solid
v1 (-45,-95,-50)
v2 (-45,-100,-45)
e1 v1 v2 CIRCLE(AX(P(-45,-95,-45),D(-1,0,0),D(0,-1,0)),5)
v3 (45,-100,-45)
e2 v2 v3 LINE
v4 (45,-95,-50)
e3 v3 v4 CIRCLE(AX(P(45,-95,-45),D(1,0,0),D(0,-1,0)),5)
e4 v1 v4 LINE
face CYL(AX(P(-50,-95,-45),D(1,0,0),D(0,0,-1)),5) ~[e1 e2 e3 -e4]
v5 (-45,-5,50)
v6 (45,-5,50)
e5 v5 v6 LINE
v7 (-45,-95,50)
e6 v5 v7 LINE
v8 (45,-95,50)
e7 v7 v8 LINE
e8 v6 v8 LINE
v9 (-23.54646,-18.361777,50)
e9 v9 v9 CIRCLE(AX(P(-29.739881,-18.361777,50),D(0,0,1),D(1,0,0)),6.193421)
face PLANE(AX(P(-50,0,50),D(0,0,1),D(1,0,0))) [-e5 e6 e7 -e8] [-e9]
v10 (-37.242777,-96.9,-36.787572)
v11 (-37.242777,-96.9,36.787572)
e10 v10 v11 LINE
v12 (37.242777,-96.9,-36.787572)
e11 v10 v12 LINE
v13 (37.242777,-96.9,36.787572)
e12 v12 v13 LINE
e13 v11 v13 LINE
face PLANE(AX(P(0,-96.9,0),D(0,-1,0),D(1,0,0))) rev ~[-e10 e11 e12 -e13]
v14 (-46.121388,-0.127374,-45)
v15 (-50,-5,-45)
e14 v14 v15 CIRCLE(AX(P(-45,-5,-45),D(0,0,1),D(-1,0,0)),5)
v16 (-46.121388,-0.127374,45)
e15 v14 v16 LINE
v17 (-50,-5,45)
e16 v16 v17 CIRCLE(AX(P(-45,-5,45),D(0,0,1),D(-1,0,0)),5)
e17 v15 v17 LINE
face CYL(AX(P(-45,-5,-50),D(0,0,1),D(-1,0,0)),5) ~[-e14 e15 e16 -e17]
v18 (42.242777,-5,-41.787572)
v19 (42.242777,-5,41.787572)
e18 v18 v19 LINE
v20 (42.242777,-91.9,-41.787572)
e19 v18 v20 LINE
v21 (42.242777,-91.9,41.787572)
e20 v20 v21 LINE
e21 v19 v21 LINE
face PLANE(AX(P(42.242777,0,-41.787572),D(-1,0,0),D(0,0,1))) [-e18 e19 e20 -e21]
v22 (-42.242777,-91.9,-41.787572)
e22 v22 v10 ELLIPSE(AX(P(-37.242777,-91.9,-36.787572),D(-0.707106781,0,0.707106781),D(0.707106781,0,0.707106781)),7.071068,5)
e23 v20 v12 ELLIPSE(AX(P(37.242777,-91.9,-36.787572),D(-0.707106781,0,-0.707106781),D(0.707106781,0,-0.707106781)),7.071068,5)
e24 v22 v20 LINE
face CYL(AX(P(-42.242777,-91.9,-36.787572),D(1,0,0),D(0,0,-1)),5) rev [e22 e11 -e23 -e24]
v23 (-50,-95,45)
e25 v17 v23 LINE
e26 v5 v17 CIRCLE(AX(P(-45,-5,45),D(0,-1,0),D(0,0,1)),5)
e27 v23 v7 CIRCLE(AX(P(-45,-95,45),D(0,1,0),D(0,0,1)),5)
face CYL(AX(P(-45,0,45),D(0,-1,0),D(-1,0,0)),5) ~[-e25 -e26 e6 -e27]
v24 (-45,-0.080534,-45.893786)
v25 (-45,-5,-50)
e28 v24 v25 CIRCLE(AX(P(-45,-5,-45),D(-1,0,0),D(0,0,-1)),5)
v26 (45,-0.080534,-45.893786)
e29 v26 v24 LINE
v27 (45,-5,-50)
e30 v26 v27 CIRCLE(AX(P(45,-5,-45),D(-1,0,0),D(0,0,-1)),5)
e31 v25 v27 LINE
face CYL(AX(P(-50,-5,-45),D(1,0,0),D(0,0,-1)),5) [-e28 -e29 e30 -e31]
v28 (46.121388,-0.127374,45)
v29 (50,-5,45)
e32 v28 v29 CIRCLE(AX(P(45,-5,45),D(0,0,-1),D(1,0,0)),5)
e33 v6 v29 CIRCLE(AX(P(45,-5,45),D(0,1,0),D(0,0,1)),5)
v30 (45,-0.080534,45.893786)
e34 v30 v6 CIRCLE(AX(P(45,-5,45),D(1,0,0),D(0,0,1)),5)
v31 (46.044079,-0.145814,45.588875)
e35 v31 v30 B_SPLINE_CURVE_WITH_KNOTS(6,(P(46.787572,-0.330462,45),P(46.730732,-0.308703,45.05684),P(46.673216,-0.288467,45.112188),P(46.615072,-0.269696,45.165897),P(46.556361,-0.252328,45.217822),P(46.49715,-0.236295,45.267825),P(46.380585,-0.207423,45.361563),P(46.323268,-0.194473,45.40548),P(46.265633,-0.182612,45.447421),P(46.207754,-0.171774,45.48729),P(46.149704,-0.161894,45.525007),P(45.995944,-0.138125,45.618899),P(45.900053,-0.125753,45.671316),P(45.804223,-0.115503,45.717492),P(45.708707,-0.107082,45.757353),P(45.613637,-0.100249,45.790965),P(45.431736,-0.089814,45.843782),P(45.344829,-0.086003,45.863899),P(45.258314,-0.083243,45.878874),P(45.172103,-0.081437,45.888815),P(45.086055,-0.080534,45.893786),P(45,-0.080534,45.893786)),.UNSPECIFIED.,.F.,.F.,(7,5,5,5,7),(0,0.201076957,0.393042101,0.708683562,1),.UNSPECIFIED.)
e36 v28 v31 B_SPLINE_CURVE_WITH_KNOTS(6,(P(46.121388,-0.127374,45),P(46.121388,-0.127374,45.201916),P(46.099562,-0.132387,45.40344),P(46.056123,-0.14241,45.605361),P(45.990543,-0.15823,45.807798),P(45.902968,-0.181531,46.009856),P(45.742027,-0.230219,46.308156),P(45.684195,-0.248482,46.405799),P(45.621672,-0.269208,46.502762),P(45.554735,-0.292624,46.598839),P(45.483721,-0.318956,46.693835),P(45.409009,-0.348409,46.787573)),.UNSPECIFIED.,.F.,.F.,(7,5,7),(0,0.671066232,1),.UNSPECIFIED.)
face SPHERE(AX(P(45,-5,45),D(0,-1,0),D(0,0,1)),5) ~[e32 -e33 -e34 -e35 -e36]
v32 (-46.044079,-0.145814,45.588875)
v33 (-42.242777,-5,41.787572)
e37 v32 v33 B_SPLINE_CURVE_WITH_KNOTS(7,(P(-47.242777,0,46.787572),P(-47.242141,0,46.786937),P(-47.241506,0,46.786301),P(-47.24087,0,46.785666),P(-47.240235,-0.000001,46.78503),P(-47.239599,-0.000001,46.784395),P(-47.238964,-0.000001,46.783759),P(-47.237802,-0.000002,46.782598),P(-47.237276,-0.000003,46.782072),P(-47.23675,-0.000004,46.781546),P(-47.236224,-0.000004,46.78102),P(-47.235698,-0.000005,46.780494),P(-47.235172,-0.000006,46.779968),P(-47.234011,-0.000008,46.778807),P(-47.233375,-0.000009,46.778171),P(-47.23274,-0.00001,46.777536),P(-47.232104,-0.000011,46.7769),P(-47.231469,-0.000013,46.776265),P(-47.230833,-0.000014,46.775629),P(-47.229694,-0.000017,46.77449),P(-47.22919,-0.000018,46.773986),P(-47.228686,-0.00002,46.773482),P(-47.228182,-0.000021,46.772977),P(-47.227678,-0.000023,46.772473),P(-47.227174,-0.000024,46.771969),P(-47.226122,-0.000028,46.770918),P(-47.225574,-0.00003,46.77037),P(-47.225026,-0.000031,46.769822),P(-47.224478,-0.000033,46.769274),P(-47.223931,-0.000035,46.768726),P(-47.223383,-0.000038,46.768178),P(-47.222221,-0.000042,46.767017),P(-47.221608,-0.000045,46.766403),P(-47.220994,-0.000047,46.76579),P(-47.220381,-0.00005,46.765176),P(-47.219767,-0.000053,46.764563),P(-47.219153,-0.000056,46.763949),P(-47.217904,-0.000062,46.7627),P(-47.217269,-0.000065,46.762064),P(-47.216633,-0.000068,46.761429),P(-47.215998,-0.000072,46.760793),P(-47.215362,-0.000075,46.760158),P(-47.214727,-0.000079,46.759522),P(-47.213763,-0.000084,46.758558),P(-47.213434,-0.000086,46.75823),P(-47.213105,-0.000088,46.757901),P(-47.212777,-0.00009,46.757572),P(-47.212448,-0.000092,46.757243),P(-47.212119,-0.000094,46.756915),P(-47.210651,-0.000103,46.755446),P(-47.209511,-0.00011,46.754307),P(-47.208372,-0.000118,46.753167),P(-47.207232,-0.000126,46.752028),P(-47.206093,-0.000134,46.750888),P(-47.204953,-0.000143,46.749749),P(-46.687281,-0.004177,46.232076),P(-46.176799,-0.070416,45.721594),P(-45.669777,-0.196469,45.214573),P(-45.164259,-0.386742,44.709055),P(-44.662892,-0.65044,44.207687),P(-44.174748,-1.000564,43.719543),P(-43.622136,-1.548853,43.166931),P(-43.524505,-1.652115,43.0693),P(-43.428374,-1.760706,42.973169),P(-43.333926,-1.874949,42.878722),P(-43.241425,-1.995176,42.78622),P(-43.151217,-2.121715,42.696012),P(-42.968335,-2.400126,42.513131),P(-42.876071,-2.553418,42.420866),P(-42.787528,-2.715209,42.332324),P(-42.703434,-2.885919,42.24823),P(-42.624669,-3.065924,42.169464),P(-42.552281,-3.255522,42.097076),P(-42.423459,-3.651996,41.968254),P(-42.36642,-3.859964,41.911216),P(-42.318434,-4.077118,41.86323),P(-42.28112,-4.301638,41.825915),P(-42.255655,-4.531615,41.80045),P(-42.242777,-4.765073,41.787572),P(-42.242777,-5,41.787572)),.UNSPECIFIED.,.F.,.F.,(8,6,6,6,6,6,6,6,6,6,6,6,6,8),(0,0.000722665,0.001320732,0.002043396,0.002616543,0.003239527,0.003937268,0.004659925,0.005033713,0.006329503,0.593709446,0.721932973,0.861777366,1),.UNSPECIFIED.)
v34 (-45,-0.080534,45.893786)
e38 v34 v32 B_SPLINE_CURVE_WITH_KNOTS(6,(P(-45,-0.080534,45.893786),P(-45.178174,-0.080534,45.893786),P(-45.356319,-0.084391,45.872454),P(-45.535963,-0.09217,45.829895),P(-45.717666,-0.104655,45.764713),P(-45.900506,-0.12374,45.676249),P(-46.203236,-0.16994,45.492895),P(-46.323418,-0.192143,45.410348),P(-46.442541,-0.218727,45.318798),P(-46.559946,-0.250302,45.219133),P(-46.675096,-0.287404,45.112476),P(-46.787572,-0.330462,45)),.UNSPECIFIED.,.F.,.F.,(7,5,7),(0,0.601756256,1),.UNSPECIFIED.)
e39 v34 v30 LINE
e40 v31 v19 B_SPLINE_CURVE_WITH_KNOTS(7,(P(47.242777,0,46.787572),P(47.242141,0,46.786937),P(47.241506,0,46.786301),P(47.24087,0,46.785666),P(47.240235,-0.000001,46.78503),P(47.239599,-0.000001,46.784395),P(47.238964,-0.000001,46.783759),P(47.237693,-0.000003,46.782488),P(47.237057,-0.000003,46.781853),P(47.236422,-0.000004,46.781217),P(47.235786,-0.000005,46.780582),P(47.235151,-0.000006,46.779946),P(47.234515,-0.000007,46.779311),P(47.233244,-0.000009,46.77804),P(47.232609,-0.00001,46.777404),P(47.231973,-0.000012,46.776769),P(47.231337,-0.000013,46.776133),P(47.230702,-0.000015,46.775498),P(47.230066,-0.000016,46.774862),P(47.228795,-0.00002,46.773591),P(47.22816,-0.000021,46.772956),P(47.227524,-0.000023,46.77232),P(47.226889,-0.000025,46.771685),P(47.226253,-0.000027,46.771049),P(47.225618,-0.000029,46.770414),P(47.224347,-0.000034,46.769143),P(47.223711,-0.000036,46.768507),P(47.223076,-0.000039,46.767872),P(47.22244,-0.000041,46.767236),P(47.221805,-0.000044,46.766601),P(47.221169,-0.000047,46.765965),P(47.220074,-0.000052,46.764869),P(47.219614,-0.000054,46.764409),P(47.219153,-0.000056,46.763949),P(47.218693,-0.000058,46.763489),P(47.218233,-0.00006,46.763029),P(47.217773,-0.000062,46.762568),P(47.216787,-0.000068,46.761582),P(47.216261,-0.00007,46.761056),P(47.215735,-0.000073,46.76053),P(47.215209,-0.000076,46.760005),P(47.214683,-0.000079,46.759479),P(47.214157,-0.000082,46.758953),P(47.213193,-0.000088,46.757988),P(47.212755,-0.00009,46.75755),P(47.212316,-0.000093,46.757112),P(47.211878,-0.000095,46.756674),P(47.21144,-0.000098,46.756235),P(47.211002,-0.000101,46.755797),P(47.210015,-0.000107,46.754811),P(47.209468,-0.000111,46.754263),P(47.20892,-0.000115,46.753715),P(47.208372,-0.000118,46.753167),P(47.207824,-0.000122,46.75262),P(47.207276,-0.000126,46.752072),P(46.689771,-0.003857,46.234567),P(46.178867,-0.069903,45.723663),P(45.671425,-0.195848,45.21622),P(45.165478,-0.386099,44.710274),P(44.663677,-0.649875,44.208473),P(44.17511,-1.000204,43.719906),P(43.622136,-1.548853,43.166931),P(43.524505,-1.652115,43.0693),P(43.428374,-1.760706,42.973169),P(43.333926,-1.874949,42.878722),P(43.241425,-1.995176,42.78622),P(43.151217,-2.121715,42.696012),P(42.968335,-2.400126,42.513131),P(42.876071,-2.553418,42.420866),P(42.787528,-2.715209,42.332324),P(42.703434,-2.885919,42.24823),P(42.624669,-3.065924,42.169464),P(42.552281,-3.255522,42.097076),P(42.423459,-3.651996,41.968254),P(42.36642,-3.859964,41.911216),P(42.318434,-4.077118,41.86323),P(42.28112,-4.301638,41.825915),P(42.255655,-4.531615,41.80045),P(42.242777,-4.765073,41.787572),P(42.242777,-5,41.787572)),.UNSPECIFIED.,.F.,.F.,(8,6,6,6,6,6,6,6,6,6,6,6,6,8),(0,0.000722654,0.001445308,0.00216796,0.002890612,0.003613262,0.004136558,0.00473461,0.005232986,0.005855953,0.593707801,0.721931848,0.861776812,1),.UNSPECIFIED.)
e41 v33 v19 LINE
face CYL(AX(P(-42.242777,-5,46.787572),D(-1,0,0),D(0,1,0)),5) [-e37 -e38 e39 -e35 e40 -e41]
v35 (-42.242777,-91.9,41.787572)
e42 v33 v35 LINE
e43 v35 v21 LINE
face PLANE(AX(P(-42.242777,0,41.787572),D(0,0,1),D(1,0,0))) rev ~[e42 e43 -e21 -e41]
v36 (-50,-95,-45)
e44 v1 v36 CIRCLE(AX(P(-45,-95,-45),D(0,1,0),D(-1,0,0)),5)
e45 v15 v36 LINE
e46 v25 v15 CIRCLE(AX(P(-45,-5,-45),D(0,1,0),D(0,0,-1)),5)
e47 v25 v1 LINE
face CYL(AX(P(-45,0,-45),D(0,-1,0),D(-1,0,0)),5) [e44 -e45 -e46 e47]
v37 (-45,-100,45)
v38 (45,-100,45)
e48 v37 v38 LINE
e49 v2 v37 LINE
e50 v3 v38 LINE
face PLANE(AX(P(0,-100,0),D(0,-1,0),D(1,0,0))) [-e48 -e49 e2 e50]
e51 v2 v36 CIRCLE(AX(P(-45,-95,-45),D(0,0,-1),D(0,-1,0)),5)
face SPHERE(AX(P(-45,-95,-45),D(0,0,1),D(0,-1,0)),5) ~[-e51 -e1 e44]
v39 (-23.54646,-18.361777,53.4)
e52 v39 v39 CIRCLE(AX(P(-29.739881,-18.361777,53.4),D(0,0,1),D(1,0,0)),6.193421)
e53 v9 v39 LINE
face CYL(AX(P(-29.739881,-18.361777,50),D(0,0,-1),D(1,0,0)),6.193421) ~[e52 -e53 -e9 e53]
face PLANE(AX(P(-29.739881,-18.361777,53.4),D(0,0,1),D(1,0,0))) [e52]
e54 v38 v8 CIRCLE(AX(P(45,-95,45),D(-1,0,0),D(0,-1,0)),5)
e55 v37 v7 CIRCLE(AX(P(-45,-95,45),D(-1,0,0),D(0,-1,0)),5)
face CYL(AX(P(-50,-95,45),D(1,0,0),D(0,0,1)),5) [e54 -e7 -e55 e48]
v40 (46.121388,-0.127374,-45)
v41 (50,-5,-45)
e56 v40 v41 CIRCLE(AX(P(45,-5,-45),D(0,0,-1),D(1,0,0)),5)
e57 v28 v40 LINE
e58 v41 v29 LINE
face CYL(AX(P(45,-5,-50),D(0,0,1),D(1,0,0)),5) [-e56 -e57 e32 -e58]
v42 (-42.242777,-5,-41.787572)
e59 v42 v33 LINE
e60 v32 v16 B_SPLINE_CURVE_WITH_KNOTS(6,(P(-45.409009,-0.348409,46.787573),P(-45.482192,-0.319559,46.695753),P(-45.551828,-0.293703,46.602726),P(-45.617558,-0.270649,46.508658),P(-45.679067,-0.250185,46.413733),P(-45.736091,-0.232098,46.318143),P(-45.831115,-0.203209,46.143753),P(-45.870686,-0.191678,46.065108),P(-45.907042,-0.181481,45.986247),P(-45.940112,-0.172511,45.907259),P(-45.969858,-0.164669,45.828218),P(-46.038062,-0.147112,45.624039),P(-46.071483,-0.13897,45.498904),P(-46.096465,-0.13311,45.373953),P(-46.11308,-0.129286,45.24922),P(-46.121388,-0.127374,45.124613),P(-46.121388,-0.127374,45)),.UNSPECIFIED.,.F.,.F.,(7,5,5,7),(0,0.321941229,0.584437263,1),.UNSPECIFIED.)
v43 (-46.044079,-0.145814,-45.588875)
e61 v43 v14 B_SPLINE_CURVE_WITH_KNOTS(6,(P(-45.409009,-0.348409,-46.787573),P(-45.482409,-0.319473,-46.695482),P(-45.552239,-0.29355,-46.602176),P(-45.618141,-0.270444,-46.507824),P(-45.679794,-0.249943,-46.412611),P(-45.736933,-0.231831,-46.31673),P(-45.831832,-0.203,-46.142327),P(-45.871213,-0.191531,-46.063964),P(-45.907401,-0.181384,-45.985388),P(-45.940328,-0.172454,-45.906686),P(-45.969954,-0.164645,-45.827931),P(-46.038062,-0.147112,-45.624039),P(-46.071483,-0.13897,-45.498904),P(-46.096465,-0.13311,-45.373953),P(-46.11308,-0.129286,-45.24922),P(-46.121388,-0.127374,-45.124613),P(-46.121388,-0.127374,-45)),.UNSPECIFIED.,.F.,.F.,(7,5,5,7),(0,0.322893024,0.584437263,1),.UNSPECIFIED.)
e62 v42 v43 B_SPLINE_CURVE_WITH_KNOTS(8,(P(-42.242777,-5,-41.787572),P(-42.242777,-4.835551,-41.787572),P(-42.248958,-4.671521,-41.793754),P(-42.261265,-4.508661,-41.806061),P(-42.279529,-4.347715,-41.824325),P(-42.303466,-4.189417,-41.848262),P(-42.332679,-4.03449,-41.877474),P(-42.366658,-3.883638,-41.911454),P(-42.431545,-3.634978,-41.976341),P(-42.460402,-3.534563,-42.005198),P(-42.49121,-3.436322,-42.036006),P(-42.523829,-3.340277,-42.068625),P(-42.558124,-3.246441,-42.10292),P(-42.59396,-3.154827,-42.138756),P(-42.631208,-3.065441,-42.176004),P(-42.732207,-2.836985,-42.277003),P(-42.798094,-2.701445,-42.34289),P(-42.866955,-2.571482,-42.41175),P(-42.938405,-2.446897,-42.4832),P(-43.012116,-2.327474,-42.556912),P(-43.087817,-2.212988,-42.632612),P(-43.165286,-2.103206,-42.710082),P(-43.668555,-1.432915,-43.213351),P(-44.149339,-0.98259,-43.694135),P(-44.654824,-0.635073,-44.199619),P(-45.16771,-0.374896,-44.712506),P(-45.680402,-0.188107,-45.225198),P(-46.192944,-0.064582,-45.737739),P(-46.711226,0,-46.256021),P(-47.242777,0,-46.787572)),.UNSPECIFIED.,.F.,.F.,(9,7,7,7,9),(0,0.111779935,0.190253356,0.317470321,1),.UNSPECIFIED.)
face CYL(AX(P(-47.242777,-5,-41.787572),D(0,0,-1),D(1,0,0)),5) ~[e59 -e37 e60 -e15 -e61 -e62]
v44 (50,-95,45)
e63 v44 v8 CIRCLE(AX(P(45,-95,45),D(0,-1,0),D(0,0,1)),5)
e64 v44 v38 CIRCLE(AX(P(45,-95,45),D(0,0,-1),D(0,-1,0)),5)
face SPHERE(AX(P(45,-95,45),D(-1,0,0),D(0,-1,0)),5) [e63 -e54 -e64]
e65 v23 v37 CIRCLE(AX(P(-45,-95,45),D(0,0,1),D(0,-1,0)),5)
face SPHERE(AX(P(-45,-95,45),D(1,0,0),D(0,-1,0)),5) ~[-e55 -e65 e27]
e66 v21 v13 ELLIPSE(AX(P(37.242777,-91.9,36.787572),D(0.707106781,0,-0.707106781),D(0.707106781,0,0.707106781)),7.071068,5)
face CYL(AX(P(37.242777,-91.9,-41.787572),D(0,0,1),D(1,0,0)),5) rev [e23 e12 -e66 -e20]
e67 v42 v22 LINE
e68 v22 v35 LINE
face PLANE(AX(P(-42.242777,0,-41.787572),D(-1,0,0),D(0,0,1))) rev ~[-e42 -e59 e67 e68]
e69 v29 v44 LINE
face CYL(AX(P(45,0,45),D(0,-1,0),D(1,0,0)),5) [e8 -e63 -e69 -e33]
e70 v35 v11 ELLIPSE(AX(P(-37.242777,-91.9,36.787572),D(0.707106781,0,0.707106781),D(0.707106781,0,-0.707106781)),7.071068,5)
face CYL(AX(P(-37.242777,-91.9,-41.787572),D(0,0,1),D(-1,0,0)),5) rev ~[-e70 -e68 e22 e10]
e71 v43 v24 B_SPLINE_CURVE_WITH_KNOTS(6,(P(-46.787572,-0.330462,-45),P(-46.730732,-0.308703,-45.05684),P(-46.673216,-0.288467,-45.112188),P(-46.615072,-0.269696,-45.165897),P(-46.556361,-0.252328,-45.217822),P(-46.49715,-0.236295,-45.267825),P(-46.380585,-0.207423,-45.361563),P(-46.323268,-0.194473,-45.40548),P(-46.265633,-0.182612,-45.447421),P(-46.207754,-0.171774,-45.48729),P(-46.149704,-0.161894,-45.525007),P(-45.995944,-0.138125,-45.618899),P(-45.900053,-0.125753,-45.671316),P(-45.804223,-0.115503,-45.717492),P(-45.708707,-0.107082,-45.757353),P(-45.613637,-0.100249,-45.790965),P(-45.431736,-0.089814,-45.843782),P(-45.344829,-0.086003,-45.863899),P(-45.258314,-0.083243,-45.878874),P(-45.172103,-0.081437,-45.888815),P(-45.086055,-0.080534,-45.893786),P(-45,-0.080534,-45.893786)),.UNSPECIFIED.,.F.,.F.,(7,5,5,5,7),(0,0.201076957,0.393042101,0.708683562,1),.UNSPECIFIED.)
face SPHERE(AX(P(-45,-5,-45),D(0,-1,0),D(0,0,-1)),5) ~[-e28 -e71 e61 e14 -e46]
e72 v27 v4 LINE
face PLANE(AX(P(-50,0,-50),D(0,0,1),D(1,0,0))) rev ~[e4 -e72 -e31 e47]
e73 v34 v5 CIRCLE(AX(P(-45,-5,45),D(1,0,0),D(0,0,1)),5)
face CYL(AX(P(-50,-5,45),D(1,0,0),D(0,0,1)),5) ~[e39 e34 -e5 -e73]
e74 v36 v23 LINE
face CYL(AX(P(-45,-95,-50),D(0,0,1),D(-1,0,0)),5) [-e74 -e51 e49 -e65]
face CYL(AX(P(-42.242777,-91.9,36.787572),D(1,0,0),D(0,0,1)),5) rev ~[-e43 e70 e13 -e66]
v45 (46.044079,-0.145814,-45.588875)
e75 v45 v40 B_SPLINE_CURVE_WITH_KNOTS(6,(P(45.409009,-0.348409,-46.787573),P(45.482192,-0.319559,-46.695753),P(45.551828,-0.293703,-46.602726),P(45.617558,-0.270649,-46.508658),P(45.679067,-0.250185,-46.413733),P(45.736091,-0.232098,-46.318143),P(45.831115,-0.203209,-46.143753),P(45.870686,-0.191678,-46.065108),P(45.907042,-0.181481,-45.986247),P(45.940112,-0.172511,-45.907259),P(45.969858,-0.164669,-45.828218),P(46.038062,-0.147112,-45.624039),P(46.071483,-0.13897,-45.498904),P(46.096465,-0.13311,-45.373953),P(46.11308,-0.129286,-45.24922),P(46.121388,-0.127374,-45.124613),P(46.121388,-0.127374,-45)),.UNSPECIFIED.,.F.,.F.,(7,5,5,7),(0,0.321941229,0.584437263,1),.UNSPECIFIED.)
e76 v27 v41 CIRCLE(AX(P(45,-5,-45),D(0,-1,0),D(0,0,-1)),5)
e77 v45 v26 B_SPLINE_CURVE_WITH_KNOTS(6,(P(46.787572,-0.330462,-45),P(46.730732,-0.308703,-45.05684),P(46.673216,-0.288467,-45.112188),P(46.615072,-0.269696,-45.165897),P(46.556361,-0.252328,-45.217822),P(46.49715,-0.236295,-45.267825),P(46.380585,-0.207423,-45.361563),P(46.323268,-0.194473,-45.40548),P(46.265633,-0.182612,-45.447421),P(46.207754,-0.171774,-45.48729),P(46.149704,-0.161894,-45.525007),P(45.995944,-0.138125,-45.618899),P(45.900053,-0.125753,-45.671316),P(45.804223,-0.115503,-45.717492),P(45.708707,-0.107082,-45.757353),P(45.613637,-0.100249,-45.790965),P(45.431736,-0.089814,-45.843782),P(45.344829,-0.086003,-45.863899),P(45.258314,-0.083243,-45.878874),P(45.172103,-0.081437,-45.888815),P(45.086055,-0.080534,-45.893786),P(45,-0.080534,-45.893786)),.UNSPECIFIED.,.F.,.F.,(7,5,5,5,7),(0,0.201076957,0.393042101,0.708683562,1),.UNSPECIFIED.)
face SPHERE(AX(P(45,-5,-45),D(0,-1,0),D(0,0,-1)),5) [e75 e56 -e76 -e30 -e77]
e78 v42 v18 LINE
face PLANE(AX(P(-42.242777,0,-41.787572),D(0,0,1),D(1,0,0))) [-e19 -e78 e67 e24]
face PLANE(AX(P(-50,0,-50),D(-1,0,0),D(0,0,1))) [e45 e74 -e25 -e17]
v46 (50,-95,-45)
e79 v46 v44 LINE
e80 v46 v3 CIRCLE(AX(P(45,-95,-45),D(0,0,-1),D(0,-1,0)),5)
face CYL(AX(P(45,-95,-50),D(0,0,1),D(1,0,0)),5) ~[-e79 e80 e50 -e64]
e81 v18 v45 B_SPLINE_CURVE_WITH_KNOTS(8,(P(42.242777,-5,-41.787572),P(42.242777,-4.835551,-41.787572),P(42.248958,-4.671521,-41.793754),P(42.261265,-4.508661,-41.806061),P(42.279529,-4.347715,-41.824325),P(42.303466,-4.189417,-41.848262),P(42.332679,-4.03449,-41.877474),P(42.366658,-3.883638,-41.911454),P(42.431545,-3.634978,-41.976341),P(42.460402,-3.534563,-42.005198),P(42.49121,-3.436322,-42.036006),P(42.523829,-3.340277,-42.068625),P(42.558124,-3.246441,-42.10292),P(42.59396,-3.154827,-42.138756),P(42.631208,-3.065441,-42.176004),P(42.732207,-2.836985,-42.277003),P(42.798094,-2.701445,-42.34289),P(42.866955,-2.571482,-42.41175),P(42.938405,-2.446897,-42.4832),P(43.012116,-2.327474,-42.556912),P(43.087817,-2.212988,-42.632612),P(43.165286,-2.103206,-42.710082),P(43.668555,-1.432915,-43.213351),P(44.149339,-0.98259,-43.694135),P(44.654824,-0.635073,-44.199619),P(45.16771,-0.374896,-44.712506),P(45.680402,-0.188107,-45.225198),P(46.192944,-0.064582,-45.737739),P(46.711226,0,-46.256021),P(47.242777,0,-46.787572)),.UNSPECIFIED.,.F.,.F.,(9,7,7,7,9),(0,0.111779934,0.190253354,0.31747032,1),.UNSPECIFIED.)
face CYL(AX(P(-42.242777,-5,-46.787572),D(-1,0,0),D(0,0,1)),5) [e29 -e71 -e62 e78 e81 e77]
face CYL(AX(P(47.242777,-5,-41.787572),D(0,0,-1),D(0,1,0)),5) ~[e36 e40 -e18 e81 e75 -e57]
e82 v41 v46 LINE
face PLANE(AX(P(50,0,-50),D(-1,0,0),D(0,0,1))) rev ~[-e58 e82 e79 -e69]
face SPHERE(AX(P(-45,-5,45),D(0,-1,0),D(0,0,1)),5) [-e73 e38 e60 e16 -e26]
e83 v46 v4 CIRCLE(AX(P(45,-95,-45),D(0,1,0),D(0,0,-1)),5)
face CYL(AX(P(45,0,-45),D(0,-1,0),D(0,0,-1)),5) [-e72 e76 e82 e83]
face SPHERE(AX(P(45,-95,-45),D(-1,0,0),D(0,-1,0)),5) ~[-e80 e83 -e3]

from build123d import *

# Parameters (mm, degrees)
F0_W         = 100
F0_H         = 100
F1_DEPTH     = 100
F2_R         = 5
F3_W         = 84.485553205
F3_H         = 83.5751444101
F4_DEPTH     = 96.9
F5_R         = 5
F6_T1_DEPTH  = 84.485553205
F6_T3_DEPTH  = 83.5751444101
F6_T9_DEPTH  = 96.985553205
F6_T13_DEPTH = 96.0751444101
F6_T20_DEPTH = 96.985553205
F6_T24_DEPTH = 96.0751444101
F6_T31_DEPTH = 96.0751444101
F6_T35_DEPTH = 96.985553205
F6_T42_DEPTH = 96.0751444101
F6_T46_DEPTH = 96.985553205
F7_R         = 6.1934205271
F8_DEPTH     = 3.4


# Not quite as in the source:
# - a fillet or chamfer that OpenCascade refuses, or shapes differently, is made with other operations: its cross-section is extruded or revolved along the edge and cut away or added


with BuildPart() as f1:
    # F0 (on Front) → F1 (new body)
    with BuildSketch(Plane.XZ):
        Rectangle(F0_W, F0_H)
    extrude(amount=F1_DEPTH)

    # F2
    f2_edges = [f1.edges().sort_by_distance(p)[0] for p in [
        (0, -100, 50),
        (-50, -100, 0),
        (0, -100, -50),
        (50, -100, 0),
        (50, -50, -50),
        (-50, -50, -50),
        (0, 0, -50),
        (50, -50, 50),
        (-50, -50, 50),
        (0, 0, 50),
        (50, 0, 0),
        (-50, 0, 0),
    ]]
    fillet(f2_edges, radius=F2_R)

    # F3 (on Front) → F4 (cut)
    with BuildSketch(Plane.XZ):
        Rectangle(F3_W, F3_H)
    extrude(amount=F4_DEPTH, mode=Mode.SUBTRACT)

    # F5
    f5_edges = [f1.edges().sort_by_distance(p)[0] for p in [
        (0, -96.9, -41.787572),
        (42.242777, -96.9, 0),
        (0, -96.9, 41.787572),
        (-42.242777, -96.9, 0),
    ]]
    fillet(f5_edges, radius=F5_R)

    # F6: fillet of radius 5 on 8 edges, made by hand

    # F6_s2 → F6_t1 (cut)
    with BuildSketch(Plane.YZ.offset(-42.2427766025)):
        with BuildLine():
            ThreePointArc((-5, -41.7875722051), (-1.4644660941, -43.2520382991), (0, -46.7875722051))
            Line((0, -46.7875722051), (0, -41.7875722051))
            Line((0, -41.7875722051), (-5, -41.7875722051))
        make_face()
        with BuildLine():
            ThreePointArc((0, 46.7875722051), (-1.4644660941, 43.2520382991), (-5, 41.7875722051))
            Line((-5, 41.7875722051), (0, 41.7875722051))
            Line((0, 41.7875722051), (0, 46.7875722051))
        make_face()
    extrude(amount=F6_T1_DEPTH, mode=Mode.SUBTRACT)

    # F6_s4 → F6_t3 (cut)
    with BuildSketch(Plane.XY.offset(-41.7875722051)):
        with BuildLine():
            ThreePointArc((47.2427766025, 0), (43.7072426966, -1.4644660941), (42.2427766025, -5))
            Line((42.2427766025, -5), (42.2427766025, 0))
            Line((42.2427766025, 0), (47.2427766025, 0))
        make_face()
        with BuildLine():
            ThreePointArc((-42.2427766025, -5), (-43.7072426966, -1.4644660941), (-47.2427766025, 0))
            Line((-47.2427766025, 0), (-42.2427766025, 0))
            Line((-42.2427766025, 0), (-42.2427766025, -5))
        make_face()
    extrude(amount=F6_T3_DEPTH, mode=Mode.SUBTRACT)


with BuildPart() as f6_tool7:
    # F6_s8 → F6_t9 (new body)
    with BuildSketch(Plane.YZ.offset(-54.7427766025)):
        with BuildLine():
            ThreePointArc((-5, -41.7875722051), (-1.4644660941, -43.2520382991), (0, -46.7875722051))
            Line((0, -46.7875722051), (0, -41.7875722051))
            Line((0, -41.7875722051), (-5, -41.7875722051))
        make_face()
    extrude(amount=F6_T9_DEPTH)

    split(bisect_by=Plane.YZ.offset(-42.2427766025), keep=Keep.BOTTOM)


with BuildPart() as f6_tool11:
    # F6_s12 → F6_t13 (new body)
    with BuildSketch(Plane.XY.offset(41.7875722051)):
        with BuildLine():
            ThreePointArc((-42.2427766025, -5), (-43.7072426966, -1.4644660941), (-47.2427766025, 0))
            Line((-47.2427766025, 0), (-42.2427766025, 0))
            Line((-42.2427766025, 0), (-42.2427766025, -5))
        make_face()
    extrude(amount=-F6_T13_DEPTH)

    split(bisect_by=Plane.XY.offset(-41.7875722051), keep=Keep.BOTTOM)


with BuildPart() as f6_tool7_1:
    add(f6_tool7.part)

    # F6_t15: intersect F6_tool11
    add(f6_tool11.part, mode=Mode.INTERSECT)


with BuildPart() as f1_1:
    add(f1.part)

    # F6_t5: cut F6_tool7
    add(f6_tool7_1.part, mode=Mode.SUBTRACT)


with BuildPart() as f6_tool18:
    # F6_s19 → F6_t20 (new body)
    with BuildSketch(Plane.YZ.offset(-42.2427766025)):
        with BuildLine():
            ThreePointArc((-5, -41.7875722051), (-1.4644660941, -43.2520382991), (0, -46.7875722051))
            Line((0, -46.7875722051), (0, -41.7875722051))
            Line((0, -41.7875722051), (-5, -41.7875722051))
        make_face()
    extrude(amount=F6_T20_DEPTH)

    split(bisect_by=Plane.YZ.offset(42.2427766025), keep=Keep.TOP)


with BuildPart() as f6_tool22:
    # F6_s23 → F6_t24 (new body)
    with BuildSketch(Plane.XY.offset(-54.2875722051)):
        with BuildLine():
            ThreePointArc((47.2427766025, 0), (43.7072426966, -1.4644660941), (42.2427766025, -5))
            Line((42.2427766025, -5), (42.2427766025, 0))
            Line((42.2427766025, 0), (47.2427766025, 0))
        make_face()
    extrude(amount=F6_T24_DEPTH)

    split(bisect_by=Plane.XY.offset(-41.7875722051), keep=Keep.BOTTOM)


with BuildPart() as f6_tool18_1:
    add(f6_tool18.part)

    # F6_t26: intersect F6_tool22
    add(f6_tool22.part, mode=Mode.INTERSECT)


with BuildPart() as f1_2:
    add(f1_1.part)

    # F6_t16: cut F6_tool18
    add(f6_tool18_1.part, mode=Mode.SUBTRACT)


with BuildPart() as f6_tool29:
    # F6_s30 → F6_t31 (new body)
    with BuildSketch(Plane.XY.offset(-41.7875722051)):
        with BuildLine():
            ThreePointArc((47.2427766025, 0), (43.7072426966, -1.4644660941), (42.2427766025, -5))
            Line((42.2427766025, -5), (42.2427766025, 0))
            Line((42.2427766025, 0), (47.2427766025, 0))
        make_face()
    extrude(amount=F6_T31_DEPTH)

    split(bisect_by=Plane.XY.offset(41.7875722051), keep=Keep.TOP)


with BuildPart() as f6_tool33:
    # F6_s34 → F6_t35 (new body)
    with BuildSketch(Plane.YZ.offset(54.7427766025)):
        with BuildLine():
            ThreePointArc((0, 46.7875722051), (-1.4644660941, 43.2520382991), (-5, 41.7875722051))
            Line((-5, 41.7875722051), (0, 41.7875722051))
            Line((0, 41.7875722051), (0, 46.7875722051))
        make_face()
    extrude(amount=-F6_T35_DEPTH)

    split(bisect_by=Plane.YZ.offset(42.2427766025), keep=Keep.TOP)


with BuildPart() as f6_tool29_1:
    add(f6_tool29.part)

    # F6_t37: intersect F6_tool33
    add(f6_tool33.part, mode=Mode.INTERSECT)


with BuildPart() as f1_3:
    add(f1_2.part)

    # F6_t27: cut F6_tool29
    add(f6_tool29_1.part, mode=Mode.SUBTRACT)


with BuildPart() as f6_tool40:
    # F6_s41 → F6_t42 (new body)
    with BuildSketch(Plane.XY.offset(54.2875722051)):
        with BuildLine():
            ThreePointArc((-42.2427766025, -5), (-43.7072426966, -1.4644660941), (-47.2427766025, 0))
            Line((-47.2427766025, 0), (-42.2427766025, 0))
            Line((-42.2427766025, 0), (-42.2427766025, -5))
        make_face()
    extrude(amount=-F6_T42_DEPTH)

    split(bisect_by=Plane.XY.offset(41.7875722051), keep=Keep.TOP)


with BuildPart() as f6_tool44:
    # F6_s45 → F6_t46 (new body)
    with BuildSketch(Plane.YZ.offset(42.2427766025)):
        with BuildLine():
            ThreePointArc((0, 46.7875722051), (-1.4644660941, 43.2520382991), (-5, 41.7875722051))
            Line((-5, 41.7875722051), (0, 41.7875722051))
            Line((0, 41.7875722051), (0, 46.7875722051))
        make_face()
    extrude(amount=-F6_T46_DEPTH)

    split(bisect_by=Plane.YZ.offset(-42.2427766025), keep=Keep.BOTTOM)


with BuildPart() as f6_tool40_1:
    add(f6_tool40.part)

    # F6_t48: intersect F6_tool44
    add(f6_tool44.part, mode=Mode.INTERSECT)


with BuildPart() as f1_4:
    add(f1_3.part)

    # F6_t38: cut F6_tool40
    add(f6_tool40_1.part, mode=Mode.SUBTRACT)

    # F7 (on face) → F8 (join)
    with BuildSketch(Plane.XY.offset(50)):
        with Locations((-29.7398809344, -18.3617770672)):
            Circle(F7_R)
    extrude(amount=F8_DEPTH)


solid = f1_4.part
